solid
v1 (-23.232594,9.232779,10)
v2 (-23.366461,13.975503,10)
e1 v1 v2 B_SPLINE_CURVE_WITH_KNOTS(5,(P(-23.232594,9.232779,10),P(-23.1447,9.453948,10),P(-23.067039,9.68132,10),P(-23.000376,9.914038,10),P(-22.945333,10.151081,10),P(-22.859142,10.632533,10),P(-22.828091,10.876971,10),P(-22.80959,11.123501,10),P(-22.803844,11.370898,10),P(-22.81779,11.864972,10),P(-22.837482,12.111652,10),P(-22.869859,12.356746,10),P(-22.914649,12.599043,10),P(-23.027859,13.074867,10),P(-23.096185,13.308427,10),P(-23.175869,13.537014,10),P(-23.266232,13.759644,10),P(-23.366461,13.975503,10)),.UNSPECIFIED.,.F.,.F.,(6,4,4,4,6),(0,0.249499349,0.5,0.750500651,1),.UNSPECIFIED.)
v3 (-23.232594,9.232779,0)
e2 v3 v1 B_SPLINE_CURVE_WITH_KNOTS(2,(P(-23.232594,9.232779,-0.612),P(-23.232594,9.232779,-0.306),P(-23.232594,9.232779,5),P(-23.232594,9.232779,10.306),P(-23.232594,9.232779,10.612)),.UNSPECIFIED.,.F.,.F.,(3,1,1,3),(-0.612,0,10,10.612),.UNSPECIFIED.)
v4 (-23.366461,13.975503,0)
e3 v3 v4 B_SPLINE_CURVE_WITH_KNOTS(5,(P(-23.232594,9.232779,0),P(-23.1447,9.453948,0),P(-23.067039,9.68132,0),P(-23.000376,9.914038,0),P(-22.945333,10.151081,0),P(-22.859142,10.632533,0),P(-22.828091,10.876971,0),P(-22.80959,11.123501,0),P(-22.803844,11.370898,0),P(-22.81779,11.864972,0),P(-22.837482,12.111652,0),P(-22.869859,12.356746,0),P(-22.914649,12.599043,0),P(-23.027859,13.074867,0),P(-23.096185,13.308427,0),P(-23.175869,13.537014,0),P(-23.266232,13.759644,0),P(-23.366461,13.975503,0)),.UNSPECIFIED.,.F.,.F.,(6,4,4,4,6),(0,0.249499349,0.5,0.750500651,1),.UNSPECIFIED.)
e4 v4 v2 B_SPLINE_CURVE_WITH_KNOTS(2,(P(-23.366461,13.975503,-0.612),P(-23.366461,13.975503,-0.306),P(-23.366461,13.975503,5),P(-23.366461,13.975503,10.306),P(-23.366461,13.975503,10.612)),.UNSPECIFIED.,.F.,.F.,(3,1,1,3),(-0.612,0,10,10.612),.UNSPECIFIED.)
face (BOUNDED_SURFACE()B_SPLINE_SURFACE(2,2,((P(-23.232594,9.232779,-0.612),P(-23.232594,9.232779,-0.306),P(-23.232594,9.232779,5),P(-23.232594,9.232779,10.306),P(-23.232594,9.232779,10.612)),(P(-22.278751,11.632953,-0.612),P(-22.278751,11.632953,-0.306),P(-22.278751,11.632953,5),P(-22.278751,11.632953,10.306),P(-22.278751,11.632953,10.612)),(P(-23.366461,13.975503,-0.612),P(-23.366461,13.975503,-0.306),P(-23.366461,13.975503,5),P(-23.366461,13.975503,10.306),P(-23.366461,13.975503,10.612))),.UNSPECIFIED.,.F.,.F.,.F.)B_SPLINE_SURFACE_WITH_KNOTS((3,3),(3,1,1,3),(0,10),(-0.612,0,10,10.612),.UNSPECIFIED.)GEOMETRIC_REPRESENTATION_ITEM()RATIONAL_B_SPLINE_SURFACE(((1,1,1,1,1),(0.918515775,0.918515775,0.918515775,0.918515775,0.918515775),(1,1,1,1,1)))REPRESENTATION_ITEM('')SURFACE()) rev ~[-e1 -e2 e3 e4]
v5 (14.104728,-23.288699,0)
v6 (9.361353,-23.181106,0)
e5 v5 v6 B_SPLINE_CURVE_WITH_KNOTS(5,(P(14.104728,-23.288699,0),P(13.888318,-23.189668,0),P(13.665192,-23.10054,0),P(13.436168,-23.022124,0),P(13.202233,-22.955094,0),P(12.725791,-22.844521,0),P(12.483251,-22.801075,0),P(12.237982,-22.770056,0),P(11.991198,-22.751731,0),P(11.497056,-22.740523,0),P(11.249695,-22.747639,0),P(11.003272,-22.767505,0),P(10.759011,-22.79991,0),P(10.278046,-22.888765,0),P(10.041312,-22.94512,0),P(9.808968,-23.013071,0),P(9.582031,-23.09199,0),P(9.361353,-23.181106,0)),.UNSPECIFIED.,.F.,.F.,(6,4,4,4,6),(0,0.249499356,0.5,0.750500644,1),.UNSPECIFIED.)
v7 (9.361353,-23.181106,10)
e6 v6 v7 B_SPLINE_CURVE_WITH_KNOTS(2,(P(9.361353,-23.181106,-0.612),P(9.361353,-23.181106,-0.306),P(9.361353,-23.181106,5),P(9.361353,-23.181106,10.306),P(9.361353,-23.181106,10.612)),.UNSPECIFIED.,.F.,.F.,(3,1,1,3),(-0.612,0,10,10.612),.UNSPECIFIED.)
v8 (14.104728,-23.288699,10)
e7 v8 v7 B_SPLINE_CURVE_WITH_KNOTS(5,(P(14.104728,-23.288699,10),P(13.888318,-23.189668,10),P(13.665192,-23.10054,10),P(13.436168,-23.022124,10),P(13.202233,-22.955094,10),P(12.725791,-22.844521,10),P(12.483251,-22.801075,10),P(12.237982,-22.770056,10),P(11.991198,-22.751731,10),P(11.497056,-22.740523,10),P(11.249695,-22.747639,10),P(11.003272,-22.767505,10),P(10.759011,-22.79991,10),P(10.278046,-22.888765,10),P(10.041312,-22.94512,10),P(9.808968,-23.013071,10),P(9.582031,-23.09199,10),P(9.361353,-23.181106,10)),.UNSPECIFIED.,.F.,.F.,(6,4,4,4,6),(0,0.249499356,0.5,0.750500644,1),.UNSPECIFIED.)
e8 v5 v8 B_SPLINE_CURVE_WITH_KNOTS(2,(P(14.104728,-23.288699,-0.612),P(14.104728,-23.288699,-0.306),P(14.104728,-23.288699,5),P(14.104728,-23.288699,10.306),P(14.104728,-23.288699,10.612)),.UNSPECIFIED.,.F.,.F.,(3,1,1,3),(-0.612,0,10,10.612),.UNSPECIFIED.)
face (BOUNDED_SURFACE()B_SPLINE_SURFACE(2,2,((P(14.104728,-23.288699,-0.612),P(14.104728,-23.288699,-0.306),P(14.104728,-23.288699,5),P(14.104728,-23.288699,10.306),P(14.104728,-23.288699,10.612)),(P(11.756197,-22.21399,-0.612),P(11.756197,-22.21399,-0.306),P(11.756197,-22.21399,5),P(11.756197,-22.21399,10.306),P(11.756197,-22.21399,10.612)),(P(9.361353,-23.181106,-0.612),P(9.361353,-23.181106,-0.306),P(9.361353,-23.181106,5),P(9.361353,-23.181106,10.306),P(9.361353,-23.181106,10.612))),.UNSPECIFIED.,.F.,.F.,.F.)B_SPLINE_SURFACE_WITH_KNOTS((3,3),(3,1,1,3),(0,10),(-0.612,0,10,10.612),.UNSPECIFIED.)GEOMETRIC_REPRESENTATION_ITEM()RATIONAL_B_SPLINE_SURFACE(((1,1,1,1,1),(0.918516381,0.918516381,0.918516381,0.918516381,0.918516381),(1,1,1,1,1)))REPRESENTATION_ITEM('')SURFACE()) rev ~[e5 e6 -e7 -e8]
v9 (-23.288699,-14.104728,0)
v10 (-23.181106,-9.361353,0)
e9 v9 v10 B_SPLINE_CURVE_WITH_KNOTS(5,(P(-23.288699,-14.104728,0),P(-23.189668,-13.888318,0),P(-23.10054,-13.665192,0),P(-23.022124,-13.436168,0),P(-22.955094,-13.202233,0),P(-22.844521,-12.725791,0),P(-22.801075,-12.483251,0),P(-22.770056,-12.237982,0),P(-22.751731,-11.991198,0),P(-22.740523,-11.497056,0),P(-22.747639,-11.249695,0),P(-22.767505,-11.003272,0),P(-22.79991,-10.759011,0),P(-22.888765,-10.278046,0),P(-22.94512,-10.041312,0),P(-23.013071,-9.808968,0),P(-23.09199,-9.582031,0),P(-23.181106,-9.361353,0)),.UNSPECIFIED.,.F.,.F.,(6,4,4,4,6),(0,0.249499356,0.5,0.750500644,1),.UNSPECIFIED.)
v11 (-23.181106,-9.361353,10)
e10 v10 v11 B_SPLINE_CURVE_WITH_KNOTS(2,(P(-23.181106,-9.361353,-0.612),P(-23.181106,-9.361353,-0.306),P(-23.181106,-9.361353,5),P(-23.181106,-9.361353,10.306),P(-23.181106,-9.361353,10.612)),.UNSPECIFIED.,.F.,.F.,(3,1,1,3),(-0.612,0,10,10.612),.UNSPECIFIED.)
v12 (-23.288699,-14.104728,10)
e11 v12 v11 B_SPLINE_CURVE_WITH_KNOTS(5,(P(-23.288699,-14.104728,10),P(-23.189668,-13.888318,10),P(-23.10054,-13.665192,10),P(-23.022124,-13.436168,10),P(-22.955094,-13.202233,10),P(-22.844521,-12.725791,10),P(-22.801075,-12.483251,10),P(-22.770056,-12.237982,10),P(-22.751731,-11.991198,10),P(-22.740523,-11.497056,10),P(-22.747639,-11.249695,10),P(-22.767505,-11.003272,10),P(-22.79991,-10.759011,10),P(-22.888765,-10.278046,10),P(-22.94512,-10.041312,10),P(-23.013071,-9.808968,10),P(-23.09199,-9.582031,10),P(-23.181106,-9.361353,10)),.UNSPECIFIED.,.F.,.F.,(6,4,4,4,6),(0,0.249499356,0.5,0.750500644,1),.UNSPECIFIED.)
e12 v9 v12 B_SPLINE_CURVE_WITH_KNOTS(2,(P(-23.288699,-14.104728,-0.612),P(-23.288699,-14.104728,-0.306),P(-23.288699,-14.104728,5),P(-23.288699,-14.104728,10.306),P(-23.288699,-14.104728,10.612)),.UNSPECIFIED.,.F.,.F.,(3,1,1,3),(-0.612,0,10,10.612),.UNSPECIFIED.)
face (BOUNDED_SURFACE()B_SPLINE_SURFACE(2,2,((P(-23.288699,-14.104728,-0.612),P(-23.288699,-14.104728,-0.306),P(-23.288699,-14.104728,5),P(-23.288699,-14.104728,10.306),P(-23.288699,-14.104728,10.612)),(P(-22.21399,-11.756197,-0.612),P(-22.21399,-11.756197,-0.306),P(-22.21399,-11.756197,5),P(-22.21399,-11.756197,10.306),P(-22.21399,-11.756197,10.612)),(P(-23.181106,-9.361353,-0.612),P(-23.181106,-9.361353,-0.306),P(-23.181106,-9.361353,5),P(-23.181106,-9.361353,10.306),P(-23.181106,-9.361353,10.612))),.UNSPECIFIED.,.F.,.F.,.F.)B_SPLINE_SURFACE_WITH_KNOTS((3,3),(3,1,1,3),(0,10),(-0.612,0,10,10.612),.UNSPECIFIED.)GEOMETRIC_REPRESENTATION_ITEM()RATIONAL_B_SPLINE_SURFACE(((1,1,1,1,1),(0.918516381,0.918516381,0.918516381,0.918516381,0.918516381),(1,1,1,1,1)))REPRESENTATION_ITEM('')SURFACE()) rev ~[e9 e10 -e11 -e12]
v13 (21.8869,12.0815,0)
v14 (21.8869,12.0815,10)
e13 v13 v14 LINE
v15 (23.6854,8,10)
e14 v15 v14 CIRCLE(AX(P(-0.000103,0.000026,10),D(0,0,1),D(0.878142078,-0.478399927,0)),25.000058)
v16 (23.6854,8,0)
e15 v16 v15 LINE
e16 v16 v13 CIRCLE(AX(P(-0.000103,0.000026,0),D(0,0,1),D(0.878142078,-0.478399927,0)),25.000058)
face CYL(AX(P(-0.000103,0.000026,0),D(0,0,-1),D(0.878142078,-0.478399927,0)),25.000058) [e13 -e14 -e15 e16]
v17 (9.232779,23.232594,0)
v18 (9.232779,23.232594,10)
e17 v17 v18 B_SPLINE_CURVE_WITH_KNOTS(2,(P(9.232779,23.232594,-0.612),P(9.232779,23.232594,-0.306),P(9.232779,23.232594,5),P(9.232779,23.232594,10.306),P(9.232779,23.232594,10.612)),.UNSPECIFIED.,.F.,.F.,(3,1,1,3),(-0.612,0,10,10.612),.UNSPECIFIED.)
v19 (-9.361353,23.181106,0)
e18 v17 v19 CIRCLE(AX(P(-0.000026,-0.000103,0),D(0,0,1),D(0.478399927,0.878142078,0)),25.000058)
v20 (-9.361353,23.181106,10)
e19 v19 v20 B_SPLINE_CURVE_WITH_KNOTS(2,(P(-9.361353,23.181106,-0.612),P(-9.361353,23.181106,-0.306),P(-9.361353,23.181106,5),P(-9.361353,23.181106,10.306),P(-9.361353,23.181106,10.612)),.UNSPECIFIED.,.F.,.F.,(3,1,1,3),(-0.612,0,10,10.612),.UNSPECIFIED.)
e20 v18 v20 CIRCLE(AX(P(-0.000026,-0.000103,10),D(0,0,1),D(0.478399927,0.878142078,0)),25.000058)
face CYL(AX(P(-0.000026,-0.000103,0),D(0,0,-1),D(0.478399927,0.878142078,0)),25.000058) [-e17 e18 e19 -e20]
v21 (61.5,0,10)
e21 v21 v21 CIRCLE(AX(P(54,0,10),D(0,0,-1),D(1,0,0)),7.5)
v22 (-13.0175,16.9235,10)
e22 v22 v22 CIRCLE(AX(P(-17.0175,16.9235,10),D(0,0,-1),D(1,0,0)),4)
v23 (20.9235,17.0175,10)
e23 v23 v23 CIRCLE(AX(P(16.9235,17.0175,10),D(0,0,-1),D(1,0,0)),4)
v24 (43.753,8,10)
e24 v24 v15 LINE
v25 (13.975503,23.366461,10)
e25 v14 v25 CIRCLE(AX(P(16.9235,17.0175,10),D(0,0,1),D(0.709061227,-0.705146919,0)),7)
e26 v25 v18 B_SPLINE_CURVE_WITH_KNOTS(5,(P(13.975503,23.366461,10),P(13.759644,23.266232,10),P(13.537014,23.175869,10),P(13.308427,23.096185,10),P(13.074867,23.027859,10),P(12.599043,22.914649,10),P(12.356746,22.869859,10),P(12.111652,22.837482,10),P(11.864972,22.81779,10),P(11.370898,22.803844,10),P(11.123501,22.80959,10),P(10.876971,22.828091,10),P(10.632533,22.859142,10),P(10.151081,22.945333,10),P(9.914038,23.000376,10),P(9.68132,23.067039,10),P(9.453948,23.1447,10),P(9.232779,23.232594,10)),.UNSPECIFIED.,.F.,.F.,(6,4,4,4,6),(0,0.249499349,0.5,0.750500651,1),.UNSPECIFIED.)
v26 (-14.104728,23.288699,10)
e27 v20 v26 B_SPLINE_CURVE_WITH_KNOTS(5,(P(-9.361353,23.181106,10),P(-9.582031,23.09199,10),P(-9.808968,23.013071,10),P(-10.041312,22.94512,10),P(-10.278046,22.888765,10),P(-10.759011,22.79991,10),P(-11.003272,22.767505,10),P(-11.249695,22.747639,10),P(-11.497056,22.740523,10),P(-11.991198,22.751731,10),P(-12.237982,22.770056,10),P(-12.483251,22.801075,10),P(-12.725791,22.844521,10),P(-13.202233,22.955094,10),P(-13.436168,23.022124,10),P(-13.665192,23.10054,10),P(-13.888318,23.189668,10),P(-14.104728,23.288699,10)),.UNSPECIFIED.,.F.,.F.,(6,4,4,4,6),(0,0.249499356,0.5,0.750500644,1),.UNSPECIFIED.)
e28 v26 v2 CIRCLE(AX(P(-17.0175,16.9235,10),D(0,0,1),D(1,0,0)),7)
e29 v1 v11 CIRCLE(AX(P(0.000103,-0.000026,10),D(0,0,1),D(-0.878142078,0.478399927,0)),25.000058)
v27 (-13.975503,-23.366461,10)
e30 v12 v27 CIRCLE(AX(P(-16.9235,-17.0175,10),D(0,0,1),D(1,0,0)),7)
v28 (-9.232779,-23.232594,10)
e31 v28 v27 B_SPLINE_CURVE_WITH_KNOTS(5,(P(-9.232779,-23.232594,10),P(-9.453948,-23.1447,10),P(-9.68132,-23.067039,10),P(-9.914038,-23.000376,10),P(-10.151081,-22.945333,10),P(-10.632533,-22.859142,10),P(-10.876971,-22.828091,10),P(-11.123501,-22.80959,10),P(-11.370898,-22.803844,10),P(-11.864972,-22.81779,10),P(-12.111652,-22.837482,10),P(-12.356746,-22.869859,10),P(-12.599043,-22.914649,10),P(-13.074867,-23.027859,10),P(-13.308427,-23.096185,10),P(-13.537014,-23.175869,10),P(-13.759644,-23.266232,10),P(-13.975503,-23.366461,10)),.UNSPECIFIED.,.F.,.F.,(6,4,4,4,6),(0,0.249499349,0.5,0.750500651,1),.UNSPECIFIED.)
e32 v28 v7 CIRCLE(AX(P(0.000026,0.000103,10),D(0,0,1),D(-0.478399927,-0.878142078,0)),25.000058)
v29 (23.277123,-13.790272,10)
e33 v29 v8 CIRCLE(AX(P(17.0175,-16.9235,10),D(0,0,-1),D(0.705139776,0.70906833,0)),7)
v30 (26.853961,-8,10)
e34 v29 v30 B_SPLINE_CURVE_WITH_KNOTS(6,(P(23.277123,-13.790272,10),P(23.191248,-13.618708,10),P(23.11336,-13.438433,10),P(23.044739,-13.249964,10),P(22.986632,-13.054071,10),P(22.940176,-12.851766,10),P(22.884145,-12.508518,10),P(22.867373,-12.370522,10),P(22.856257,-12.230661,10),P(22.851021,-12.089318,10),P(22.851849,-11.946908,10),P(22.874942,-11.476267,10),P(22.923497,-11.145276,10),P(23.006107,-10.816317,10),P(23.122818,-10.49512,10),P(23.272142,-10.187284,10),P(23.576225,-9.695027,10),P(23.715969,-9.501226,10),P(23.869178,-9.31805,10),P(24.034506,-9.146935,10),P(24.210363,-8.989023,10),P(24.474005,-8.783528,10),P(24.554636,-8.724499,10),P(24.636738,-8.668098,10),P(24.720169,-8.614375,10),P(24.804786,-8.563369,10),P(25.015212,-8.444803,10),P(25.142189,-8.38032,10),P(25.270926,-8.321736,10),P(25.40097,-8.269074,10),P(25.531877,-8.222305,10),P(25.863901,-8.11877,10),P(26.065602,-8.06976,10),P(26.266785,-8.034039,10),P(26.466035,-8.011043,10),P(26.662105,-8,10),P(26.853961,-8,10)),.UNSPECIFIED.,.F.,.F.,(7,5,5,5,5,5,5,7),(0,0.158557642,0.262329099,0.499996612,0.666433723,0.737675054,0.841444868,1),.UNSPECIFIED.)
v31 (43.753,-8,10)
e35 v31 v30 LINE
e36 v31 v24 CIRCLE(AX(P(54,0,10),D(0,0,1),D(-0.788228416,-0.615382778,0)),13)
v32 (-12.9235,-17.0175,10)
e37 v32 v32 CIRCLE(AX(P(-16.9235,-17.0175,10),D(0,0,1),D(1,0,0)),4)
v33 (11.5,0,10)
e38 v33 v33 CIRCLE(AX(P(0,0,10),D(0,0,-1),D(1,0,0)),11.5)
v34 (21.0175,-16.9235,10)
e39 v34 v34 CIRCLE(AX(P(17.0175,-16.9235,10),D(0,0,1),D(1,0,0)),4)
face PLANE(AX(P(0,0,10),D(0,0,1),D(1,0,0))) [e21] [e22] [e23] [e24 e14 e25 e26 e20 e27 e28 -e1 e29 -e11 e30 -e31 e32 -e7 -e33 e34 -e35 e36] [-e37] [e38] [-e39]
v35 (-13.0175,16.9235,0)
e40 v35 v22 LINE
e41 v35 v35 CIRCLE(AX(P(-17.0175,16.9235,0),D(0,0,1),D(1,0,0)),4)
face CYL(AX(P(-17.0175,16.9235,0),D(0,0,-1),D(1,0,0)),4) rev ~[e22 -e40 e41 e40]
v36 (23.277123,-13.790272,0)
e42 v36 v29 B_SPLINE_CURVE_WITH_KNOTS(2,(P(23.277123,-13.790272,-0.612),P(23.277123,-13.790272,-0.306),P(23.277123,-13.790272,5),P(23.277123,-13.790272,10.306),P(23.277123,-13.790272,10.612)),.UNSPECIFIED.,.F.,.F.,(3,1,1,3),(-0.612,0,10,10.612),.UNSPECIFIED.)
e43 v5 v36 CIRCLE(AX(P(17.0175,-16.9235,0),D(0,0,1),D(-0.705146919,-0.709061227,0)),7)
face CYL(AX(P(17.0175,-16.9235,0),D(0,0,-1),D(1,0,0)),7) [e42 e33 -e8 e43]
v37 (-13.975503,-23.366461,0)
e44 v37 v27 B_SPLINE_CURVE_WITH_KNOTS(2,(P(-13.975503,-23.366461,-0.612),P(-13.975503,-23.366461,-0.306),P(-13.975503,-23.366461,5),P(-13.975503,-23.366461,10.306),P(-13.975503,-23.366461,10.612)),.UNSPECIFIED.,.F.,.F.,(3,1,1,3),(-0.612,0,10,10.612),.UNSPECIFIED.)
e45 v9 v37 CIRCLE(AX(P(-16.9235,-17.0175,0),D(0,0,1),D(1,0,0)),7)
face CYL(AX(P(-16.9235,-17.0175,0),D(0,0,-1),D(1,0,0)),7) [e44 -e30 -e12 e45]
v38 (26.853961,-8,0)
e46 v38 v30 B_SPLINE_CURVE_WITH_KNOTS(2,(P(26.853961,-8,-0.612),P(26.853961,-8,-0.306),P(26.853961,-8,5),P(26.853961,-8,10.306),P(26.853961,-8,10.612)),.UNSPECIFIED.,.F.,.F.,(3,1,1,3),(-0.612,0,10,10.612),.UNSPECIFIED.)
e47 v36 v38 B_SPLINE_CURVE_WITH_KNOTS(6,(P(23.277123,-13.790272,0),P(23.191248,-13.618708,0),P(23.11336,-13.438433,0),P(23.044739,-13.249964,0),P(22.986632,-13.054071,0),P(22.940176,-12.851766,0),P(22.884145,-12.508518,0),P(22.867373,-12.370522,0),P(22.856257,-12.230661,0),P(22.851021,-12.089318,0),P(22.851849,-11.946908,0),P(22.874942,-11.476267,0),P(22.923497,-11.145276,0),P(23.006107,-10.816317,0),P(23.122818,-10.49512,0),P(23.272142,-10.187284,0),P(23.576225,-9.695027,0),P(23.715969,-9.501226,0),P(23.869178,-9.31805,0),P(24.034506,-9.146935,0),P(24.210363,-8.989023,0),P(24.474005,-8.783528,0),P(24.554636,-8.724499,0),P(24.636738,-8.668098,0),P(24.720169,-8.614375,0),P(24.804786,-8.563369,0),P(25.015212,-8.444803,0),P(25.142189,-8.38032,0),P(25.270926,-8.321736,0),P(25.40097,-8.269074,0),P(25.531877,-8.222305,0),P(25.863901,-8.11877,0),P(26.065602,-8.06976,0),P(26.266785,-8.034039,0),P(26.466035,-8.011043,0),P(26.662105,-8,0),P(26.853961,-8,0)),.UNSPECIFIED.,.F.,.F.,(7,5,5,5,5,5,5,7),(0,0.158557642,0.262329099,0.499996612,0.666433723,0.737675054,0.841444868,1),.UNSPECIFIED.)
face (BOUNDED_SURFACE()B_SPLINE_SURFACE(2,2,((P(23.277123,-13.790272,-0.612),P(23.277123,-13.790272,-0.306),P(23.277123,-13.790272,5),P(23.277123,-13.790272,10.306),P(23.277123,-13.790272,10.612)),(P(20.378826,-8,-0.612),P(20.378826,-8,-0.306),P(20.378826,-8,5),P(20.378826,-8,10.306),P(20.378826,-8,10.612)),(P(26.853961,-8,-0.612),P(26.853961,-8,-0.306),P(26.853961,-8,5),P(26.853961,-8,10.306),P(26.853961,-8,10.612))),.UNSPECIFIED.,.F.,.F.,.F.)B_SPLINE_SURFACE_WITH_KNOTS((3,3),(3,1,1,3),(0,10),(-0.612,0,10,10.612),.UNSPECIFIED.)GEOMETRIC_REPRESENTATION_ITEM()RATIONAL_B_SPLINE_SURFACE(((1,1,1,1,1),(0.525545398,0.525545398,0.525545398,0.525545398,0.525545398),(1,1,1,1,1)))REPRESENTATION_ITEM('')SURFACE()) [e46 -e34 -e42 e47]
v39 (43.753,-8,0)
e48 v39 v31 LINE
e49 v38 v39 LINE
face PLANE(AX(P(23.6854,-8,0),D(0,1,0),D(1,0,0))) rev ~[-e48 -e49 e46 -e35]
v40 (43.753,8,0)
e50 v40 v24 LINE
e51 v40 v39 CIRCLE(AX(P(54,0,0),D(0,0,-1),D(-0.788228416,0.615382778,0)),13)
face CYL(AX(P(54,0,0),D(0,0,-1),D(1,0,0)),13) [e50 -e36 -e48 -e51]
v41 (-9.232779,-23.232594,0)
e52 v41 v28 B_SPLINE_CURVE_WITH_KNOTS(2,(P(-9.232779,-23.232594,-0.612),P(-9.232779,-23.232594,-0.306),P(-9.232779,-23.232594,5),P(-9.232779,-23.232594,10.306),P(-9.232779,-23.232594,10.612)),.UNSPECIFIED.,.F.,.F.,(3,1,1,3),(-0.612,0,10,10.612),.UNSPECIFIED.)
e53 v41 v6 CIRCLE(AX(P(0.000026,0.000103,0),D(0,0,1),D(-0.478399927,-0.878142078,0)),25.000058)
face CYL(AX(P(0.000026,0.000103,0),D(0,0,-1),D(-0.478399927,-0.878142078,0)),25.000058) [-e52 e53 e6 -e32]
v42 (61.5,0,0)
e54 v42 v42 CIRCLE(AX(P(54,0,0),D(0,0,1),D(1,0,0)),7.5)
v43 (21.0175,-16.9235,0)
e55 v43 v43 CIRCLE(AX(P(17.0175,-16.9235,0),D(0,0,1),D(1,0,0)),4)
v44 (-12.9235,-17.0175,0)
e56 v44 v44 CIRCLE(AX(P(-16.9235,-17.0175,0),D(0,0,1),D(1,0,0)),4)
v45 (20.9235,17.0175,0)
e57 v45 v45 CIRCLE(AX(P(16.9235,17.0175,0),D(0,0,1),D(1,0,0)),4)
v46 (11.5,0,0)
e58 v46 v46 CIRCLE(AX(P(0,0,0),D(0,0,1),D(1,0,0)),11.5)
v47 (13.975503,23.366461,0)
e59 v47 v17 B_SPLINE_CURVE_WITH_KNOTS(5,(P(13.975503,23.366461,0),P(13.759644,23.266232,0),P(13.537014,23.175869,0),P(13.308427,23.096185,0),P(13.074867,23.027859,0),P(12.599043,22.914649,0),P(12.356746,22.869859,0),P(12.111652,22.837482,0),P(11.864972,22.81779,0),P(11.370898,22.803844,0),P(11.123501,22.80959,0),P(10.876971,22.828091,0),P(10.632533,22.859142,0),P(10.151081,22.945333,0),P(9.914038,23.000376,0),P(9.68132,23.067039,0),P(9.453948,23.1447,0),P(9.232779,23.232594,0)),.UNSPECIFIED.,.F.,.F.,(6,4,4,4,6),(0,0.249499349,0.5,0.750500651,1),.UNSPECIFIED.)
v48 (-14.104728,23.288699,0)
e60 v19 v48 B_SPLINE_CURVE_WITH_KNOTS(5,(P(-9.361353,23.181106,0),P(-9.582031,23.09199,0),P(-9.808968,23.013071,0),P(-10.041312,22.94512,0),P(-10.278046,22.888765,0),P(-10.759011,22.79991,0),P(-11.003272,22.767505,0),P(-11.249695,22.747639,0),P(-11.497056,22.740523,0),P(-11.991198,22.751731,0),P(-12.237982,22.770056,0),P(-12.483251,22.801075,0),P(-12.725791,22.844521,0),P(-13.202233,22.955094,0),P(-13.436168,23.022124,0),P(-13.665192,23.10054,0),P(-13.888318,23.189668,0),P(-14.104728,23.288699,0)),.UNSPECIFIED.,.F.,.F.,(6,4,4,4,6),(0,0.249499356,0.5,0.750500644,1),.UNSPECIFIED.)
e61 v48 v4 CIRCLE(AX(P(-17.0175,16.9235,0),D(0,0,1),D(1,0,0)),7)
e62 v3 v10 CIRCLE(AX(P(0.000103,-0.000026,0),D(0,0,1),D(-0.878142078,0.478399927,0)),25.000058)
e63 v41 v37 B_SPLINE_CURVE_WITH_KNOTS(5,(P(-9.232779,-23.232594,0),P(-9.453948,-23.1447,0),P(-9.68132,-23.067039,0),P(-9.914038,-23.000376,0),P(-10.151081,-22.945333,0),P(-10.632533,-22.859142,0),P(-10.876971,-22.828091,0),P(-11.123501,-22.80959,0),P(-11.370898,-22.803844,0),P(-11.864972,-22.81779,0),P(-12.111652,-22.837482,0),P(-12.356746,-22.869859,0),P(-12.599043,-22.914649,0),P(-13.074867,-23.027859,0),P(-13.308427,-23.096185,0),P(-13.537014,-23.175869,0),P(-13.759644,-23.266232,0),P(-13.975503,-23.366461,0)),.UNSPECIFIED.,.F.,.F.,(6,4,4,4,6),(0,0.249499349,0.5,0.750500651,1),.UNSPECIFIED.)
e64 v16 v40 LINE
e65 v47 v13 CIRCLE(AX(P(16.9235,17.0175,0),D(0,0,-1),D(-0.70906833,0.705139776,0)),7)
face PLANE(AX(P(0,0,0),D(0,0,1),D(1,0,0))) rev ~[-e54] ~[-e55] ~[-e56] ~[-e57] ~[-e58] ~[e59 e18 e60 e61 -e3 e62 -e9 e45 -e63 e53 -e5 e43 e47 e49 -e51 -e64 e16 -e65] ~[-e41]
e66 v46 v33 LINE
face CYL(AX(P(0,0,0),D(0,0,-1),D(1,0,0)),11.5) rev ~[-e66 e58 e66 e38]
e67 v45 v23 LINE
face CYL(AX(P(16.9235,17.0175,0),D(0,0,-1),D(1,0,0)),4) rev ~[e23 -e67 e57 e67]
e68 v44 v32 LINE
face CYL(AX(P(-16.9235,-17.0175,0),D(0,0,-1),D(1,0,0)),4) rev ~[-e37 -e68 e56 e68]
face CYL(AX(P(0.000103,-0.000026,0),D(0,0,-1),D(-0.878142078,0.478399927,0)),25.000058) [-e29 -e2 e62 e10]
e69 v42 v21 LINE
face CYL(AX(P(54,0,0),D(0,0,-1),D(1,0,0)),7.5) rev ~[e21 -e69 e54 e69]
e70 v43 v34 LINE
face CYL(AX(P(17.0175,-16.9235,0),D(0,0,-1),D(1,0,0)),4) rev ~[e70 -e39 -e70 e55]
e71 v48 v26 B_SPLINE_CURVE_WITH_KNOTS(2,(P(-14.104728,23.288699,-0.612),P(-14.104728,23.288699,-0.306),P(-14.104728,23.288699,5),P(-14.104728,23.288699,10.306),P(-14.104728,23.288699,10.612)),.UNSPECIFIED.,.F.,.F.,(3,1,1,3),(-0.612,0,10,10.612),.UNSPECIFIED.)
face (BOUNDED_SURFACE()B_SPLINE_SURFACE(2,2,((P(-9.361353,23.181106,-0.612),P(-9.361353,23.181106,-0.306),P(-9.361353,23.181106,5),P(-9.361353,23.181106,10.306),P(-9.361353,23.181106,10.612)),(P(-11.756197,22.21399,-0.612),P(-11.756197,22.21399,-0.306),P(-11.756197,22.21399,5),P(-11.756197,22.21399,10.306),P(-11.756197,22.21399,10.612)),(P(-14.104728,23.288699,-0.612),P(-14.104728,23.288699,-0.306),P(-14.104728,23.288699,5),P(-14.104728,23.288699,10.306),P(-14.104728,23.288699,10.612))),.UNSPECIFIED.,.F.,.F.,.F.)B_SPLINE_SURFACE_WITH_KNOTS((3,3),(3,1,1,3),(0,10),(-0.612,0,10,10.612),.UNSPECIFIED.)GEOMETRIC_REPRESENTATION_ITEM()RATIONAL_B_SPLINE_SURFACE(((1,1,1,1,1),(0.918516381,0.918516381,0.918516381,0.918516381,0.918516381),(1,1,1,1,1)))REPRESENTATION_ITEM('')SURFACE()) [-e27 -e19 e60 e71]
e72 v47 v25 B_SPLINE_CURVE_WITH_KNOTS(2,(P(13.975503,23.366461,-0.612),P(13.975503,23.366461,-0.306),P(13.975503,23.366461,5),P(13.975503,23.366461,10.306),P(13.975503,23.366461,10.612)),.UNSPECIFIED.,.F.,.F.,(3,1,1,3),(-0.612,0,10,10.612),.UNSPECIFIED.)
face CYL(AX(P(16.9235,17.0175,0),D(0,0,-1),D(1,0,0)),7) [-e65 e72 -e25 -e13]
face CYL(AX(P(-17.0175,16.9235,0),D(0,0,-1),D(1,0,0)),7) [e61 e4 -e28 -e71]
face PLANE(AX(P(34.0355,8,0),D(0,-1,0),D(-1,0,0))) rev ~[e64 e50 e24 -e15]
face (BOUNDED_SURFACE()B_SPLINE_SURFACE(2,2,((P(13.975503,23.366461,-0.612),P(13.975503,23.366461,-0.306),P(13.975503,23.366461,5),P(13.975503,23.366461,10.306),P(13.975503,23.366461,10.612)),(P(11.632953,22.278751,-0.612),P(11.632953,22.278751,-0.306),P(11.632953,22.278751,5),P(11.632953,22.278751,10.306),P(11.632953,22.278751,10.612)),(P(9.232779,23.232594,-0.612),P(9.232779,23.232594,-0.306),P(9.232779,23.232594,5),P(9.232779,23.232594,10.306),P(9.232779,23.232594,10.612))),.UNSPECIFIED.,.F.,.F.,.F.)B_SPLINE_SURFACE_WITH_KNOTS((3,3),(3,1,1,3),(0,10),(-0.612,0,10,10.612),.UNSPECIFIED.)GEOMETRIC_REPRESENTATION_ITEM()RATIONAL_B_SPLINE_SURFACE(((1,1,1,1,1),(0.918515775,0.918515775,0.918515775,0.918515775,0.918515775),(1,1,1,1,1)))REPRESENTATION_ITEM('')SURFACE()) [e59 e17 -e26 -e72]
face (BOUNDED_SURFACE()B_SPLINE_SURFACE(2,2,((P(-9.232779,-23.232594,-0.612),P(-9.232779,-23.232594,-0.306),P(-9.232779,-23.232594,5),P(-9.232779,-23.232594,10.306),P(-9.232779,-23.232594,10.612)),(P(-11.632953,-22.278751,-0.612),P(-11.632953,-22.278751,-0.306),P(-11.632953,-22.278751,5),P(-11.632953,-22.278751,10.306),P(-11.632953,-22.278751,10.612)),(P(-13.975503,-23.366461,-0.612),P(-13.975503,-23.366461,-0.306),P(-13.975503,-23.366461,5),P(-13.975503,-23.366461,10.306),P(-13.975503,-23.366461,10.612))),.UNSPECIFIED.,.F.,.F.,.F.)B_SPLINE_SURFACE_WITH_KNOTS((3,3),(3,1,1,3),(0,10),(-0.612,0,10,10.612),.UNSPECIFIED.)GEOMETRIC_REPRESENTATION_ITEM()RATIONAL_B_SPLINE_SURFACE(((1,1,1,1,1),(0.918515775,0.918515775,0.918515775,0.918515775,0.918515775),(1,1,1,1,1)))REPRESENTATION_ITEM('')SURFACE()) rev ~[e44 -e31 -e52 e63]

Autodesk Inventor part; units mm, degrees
ref_plane "YZ Plane" through (0, 0, 0) normal (1, 0, 0) x (0, 1, 0)
ref_plane "XZ Plane" through (0, 0, 0) normal (0, 1, 0) x (-1, 0, 0)
ref_plane "XY Plane" through (0, 0, 0) normal (0, 0, 1) x (1, 0, 0)
sketch "Sketch1" plane through (0, 0, 0) normal (1, 0, 0) x (0, 1, 0)
  point P0 (0, 0)
sketch "Sketch2" plane through (0, 0, 0) normal (0, 0, 1) x (1, 0, 0)
  circle A0 centre (0, 0) radius 11.5
  line L0 (0, 0) -> (16.9235, 17.0175)
  circle A1 centre (16.9235, 17.0175) radius 4
  circle A2 centre (16.9235, 17.0175) radius 7
  circle A3 centre (-17.0175, 16.9235) radius 4
  circle A4 centre (-17.0175, 16.9235) radius 7
  circle A5 centre (-16.9235, -17.0175) radius 4
  circle A6 centre (-16.9235, -17.0175) radius 7
  circle A7 centre (17.0175, -16.9235) radius 4
  circle A8 centre (17.0175, -16.9235) radius 7
  line L1 (0, 0) -> (54, 0)
  circle A9 centre (54, 0) radius 7.5
  circle A10 centre (54, 0) radius 13
  line L2 (34.0355, 0) -> (34.0355, 8)
  line L3 (34.0355, 8) -> (34.0355, -8)
  line L4 (34.0355, -8) -> (43.753, -8)
  line L5 (23.6854, -8) -> (34.0355, -8)
  line L6 (34.0355, 8) -> (43.753, 8)
  line L7 (34.0355, 8) -> (23.6854, 8)
  arc A11 (-19.5919, 13.8621) -> (-21.1769, 11.2933) centre (0, 0) ccw
  arc A12 (11.96, 21.9535) -> (-12.0815, 21.8869) centre (0, 0) ccw
  arc A13 (-21.9535, 11.96) -> (-21.8869, -12.0815) centre (0, 0) ccw
  arc A14 (-11.96, -21.9535) -> (12.0815, -21.8869) centre (0, 0) ccw
  arc A15 (21.9535, -11.96) -> (21.8869, 12.0815) centre (0, 0) ccw
  dimension "d1" = 23
  dimension "d4" = 8
  dimension "d5" = 14
  dimension "d8" = 360
  dimension "d10" = 54
  dimension "d11" = 15
  dimension "d12" = 26
  dimension "d13" = 8
  dimension "d14" = 16
extrude "Extrusion1" add sketch "Sketch2" along normal blind 10 contours L1 A15 A8 A14 A6 A13 A4 A12 A2 L0 A0 | A0 L0 A2 A15 L1 | A15 L7 L2 L1 | L1 L3 L5 A15 | A2 | L2 L6 A10 L1 | L1 A10 L4 L3 | A10 | A8 | A4 | A6 | A9
extrude "Extrusion2" cut sketch "Sketch2" along normal blind 10 contours A9
fillet "Fillet1" radius 4 2 edges at (23.6854, -8, 5) (21.9535, -11.96, 5)
fillet "Fillet2" radius 6 6 edges at (11.96, 21.9535, 5) (-12.0815, 21.8869, 5) (-21.9535, 11.96, 5) (-21.8869, -12.0815, 5) (-11.96, -21.9535, 5) (12.0815, -21.8869, 5)
properties part number "hw13"
